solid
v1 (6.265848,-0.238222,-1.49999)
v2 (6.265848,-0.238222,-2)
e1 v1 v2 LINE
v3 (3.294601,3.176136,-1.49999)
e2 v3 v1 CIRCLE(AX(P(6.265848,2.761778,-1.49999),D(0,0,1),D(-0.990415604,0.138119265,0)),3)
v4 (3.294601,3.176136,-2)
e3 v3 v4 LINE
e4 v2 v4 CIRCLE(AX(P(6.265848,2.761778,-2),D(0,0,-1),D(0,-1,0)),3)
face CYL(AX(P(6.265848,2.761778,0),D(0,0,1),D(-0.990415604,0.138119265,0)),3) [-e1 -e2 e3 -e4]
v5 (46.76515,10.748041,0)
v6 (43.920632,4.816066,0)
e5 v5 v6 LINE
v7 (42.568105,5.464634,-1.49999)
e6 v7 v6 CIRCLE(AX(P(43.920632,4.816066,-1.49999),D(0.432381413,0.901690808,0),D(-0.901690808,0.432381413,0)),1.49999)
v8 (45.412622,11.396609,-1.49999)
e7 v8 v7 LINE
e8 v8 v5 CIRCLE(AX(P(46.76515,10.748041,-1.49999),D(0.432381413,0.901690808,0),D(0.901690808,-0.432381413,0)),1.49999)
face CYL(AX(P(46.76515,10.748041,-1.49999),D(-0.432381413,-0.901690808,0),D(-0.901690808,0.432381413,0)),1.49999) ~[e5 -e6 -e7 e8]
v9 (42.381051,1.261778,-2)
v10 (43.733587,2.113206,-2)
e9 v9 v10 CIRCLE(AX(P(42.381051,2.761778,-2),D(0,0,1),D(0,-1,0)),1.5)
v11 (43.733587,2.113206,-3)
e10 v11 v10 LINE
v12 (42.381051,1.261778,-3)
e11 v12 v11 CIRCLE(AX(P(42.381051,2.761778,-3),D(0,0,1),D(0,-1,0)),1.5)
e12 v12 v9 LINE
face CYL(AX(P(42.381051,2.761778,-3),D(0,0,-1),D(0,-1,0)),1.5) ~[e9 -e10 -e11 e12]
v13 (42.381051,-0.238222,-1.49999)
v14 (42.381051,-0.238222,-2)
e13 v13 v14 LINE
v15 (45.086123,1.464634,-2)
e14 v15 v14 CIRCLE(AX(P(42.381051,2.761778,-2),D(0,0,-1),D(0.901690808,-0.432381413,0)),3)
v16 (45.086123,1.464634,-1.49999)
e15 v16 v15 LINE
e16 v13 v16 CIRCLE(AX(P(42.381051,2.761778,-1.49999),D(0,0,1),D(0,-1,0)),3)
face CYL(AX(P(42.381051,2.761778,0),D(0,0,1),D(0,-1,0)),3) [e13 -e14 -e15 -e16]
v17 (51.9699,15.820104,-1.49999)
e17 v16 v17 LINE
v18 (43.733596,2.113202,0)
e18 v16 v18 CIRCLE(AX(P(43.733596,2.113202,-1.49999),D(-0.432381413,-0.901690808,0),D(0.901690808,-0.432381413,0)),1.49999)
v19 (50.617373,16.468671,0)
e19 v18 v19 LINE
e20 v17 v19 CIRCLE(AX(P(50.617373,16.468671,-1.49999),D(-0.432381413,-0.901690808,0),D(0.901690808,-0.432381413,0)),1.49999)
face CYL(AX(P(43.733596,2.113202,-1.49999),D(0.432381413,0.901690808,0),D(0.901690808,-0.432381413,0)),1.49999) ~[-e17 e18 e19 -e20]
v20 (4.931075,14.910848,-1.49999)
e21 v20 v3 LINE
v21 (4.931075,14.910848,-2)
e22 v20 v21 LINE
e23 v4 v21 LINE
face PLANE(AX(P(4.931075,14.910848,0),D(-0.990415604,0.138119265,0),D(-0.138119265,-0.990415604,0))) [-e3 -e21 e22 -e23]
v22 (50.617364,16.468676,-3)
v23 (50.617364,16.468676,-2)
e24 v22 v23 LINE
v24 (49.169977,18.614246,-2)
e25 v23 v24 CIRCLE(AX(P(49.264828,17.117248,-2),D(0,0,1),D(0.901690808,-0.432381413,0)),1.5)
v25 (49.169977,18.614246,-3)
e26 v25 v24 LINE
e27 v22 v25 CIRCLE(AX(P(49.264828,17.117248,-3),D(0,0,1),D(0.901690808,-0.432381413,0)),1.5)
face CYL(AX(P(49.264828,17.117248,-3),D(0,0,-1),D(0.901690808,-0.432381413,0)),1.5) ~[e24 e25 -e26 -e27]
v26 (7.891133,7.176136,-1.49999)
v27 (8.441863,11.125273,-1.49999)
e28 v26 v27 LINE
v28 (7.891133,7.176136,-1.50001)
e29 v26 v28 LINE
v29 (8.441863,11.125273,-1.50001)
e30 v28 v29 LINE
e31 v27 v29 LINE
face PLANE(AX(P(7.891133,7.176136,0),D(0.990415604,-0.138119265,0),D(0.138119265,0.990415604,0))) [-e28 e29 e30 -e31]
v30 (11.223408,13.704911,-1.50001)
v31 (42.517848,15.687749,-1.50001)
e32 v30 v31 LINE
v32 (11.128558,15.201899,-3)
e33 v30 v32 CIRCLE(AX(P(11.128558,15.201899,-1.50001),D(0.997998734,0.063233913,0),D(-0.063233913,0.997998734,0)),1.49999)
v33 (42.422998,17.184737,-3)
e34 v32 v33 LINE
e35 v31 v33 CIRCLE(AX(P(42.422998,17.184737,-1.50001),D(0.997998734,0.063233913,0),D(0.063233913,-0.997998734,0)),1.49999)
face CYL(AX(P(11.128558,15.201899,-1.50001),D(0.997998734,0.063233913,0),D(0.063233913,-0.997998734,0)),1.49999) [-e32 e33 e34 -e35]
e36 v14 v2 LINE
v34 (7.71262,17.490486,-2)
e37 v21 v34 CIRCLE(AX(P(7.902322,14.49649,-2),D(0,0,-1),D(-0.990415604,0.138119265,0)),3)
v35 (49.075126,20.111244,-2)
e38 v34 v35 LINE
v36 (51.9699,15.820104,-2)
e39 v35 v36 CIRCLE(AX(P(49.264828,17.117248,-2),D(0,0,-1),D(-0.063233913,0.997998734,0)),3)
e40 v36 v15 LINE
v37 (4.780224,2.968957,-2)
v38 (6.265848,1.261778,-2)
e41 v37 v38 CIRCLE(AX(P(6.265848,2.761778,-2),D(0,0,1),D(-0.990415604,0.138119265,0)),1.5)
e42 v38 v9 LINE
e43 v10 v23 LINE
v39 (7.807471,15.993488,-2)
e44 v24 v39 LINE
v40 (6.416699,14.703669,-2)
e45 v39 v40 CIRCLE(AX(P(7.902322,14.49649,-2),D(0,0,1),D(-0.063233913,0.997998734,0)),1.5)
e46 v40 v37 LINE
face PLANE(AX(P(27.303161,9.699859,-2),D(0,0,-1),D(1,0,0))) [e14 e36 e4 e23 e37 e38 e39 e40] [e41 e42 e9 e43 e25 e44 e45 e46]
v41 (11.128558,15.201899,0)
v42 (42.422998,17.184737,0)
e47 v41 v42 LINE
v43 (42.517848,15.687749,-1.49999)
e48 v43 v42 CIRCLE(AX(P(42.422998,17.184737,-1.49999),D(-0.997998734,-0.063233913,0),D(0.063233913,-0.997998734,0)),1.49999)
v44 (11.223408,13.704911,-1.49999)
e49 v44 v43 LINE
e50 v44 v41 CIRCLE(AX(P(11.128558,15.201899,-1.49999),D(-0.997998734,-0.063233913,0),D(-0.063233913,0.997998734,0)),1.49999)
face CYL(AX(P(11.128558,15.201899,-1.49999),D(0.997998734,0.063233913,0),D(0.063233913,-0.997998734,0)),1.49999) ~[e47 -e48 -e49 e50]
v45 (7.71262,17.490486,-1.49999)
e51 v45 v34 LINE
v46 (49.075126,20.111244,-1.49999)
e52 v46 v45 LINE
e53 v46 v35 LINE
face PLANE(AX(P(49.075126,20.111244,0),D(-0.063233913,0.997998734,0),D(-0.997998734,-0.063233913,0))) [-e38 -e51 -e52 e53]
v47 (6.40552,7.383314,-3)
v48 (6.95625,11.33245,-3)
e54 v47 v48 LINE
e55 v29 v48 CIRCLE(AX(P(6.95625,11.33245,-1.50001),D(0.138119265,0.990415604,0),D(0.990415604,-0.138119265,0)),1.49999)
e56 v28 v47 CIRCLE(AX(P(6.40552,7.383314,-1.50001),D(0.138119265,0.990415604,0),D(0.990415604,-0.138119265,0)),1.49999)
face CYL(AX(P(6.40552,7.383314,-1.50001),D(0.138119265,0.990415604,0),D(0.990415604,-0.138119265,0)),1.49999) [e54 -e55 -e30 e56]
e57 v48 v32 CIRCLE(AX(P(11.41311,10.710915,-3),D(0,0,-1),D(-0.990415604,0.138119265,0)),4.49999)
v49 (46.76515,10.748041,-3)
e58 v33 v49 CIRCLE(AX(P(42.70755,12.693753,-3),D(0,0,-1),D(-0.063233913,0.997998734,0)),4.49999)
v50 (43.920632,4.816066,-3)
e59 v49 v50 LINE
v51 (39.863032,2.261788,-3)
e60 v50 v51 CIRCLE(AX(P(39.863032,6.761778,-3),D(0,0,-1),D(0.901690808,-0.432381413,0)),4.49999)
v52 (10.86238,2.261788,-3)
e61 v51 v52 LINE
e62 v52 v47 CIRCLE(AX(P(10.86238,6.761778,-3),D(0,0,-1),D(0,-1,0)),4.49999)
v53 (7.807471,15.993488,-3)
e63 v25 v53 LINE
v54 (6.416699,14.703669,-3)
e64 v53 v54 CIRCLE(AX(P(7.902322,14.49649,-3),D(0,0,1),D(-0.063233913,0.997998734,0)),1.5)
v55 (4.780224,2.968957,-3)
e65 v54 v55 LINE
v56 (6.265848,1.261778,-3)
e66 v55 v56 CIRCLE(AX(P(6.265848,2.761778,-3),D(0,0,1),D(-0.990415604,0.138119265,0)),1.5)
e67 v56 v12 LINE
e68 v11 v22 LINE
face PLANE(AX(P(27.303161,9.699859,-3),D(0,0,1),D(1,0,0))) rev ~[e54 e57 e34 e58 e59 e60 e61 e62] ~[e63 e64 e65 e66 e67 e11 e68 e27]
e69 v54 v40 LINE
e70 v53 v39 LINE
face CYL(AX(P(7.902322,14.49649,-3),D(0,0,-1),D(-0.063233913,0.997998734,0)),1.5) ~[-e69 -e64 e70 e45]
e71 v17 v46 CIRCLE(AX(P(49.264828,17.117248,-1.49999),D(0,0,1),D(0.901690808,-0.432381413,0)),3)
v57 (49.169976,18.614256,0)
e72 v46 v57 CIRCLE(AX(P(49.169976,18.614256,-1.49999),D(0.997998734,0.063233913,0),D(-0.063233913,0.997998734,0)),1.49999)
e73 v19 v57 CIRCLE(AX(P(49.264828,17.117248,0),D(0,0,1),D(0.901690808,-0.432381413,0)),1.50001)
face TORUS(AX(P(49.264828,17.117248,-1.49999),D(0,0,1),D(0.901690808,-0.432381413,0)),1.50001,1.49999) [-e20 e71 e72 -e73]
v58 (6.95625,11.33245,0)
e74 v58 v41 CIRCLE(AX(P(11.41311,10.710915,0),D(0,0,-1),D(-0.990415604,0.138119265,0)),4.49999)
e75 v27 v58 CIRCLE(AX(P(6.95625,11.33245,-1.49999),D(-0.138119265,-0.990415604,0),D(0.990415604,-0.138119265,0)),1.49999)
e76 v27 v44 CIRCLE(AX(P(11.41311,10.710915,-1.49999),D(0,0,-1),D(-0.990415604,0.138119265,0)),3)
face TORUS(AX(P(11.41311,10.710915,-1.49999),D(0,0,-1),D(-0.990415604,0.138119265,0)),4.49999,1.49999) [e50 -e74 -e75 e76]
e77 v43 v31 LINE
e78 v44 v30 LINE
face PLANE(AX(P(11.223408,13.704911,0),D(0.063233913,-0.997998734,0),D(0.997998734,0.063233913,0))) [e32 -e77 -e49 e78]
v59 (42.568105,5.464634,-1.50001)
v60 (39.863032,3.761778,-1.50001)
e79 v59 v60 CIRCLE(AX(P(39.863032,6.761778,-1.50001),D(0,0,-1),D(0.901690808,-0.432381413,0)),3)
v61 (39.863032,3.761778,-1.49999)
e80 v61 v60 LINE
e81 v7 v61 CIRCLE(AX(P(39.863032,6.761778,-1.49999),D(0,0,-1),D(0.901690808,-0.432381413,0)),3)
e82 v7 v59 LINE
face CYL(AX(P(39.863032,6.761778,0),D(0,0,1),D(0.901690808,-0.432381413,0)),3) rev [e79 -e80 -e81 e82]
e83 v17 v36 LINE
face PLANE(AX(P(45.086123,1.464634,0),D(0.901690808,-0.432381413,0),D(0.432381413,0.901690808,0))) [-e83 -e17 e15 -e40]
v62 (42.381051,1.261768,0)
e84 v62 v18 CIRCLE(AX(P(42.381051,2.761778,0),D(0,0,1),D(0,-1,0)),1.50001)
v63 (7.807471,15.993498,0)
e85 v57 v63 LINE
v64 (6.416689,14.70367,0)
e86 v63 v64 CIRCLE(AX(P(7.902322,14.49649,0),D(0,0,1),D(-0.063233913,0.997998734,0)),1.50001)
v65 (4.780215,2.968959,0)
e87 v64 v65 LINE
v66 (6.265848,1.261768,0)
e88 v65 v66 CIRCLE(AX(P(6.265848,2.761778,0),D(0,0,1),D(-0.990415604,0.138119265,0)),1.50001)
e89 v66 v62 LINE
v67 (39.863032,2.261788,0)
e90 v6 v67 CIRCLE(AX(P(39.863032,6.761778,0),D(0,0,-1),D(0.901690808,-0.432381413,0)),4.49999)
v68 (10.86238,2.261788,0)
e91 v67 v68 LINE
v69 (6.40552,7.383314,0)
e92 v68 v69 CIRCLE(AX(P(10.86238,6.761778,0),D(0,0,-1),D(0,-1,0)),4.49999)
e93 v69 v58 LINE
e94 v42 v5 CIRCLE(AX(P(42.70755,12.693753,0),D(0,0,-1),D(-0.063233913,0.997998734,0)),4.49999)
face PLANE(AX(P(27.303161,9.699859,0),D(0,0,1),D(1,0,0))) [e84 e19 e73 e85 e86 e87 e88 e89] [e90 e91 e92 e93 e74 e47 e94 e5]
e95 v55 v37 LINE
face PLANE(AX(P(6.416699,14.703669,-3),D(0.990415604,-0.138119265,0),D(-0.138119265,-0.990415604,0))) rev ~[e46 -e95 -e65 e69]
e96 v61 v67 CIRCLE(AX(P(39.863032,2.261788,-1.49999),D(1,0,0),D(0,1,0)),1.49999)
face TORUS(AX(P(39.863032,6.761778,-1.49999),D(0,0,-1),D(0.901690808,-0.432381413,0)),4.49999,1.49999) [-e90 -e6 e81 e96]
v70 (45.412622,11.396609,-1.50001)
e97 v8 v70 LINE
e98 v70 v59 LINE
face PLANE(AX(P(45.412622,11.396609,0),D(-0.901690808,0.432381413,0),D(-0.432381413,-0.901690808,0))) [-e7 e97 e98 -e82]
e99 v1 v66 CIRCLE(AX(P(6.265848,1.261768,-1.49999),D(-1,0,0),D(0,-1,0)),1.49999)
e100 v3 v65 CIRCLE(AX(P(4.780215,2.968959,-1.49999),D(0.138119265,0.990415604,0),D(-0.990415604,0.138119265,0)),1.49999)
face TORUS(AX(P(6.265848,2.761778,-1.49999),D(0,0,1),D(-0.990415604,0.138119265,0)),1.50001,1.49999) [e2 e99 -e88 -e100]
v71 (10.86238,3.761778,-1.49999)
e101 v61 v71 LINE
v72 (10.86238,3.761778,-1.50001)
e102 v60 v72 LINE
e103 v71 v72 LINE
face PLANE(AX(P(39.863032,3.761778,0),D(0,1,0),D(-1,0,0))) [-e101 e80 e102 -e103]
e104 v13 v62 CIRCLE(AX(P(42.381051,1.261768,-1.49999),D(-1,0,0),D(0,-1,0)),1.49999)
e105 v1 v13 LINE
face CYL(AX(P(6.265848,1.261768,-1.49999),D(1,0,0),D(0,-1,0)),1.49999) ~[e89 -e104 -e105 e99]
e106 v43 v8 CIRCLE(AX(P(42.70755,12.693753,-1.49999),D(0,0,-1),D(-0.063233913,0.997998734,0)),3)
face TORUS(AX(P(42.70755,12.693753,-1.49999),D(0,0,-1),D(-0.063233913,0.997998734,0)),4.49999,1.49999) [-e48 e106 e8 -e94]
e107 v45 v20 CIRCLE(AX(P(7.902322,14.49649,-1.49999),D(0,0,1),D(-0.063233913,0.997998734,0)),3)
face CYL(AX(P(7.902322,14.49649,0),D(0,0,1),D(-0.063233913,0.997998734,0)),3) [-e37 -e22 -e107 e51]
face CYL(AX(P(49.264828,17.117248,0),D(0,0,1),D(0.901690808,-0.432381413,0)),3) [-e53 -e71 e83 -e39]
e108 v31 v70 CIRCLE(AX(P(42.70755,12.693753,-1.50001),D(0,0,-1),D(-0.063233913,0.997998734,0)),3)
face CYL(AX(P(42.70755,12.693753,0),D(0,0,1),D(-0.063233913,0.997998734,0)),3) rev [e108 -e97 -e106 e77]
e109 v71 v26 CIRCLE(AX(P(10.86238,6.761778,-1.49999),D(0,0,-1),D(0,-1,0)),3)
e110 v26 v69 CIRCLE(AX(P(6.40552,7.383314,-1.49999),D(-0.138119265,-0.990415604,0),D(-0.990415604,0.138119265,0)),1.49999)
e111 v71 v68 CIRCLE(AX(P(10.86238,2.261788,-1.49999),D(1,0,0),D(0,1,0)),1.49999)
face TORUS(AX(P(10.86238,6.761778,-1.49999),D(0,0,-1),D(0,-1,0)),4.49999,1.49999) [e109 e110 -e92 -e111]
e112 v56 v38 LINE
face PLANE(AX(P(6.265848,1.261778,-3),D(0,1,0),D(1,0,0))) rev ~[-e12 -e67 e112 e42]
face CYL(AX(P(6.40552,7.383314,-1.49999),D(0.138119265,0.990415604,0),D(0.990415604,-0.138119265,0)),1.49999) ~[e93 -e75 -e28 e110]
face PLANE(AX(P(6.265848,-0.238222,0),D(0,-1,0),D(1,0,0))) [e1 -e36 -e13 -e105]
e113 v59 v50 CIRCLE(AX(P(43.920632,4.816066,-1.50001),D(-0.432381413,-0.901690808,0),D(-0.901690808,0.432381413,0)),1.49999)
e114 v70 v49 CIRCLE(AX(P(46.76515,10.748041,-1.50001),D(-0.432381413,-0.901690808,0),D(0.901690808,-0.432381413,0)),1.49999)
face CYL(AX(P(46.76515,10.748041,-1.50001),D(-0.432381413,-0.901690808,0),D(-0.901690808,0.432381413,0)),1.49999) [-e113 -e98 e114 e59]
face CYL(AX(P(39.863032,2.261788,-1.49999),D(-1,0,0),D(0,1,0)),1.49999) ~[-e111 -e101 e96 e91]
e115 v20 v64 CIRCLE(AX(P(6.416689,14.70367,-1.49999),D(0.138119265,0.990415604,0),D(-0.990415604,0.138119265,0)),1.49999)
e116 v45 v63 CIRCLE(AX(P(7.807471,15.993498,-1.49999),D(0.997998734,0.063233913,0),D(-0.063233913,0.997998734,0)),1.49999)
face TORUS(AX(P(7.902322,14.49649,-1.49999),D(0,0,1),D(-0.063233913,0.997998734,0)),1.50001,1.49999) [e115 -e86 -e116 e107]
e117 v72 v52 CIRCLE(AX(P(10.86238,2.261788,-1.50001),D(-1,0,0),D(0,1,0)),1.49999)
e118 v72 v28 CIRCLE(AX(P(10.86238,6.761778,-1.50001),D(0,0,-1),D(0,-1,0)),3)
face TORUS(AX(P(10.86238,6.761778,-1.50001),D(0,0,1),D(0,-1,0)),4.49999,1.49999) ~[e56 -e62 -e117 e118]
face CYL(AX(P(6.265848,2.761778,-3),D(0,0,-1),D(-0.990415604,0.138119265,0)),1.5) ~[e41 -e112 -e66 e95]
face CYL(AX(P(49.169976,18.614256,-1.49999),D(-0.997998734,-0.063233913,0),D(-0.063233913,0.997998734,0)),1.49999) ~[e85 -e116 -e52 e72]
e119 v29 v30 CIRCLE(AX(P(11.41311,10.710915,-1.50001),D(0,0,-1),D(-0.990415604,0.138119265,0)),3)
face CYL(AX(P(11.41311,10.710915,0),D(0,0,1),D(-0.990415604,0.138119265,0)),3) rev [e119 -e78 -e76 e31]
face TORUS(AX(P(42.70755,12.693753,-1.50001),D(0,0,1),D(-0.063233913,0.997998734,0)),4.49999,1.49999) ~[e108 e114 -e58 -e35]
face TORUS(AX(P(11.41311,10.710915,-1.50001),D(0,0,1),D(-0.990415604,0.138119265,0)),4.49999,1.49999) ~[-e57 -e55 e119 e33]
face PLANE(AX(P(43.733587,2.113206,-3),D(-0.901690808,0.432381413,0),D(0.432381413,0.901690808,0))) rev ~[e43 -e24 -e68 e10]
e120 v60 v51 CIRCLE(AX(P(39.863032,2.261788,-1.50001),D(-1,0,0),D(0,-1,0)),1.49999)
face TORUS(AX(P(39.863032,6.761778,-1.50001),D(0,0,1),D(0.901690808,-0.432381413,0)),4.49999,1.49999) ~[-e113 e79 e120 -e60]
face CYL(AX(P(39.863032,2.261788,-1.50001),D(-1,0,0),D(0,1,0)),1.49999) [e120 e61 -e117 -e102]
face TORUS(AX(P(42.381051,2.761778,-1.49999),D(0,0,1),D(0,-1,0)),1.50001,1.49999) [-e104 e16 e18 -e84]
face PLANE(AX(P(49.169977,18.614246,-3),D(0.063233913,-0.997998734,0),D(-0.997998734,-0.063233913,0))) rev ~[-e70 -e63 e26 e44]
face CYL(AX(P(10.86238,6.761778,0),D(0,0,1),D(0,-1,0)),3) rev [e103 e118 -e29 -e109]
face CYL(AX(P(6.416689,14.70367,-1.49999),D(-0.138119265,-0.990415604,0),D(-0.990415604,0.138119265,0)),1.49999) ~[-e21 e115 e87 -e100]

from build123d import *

# Parameters (mm, degrees)
F1_DEPTH = 3
F2_R     = 1.49999
F5_DEPTH = 1


# Not quite as in the source:
# - a fillet or chamfer is up to 0.001 mm smaller than in the source, because OpenCascade refuses the exact size
# - a feature names something its author has since deleted; it is built from what else it names


with BuildPart() as f1:
    # F0 (on Top) → F1 (new body)
    with BuildSketch(Plane.XY):
        with BuildLine():
            ThreePointArc((7.7126204308, 17.4904861667), (5.8623387123, 16.6961416403), (4.9310753592, 14.9108477622))
            Line((4.9310753592, 14.9108477622), (3.2946010031, 3.1761362209))
            ThreePointArc((3.2946010031, 3.1761362209), (4.002766576, 0.7923969722), (6.265847815, -0.2382215753))
            Line((6.265847815, -0.2382215753), (42.381050937, -0.2382215753))
            ThreePointArc((42.381050937, -0.2382215753), (43.9792635765, 0.2229368859), (45.0861233616, 1.4646341854))
            Line((45.0861233616, 1.4646341854), (51.9699000588, 15.820103651))
            ThreePointArc((51.9699000588, 15.820103651), (51.7518427103, 18.7949713512), (49.0751258939, 20.1112440911))
            Line((49.0751258939, 20.1112440911), (7.7126204308, 17.4904861667))
        make_face()
        with BuildLine():
            Line((39.8630322028, 3.7617784247), (10.8623798602, 3.7617784247))
            ThreePointArc((10.8623798602, 3.7617784247), (8.5992986212, 4.7923969722), (7.8911330484, 7.1761362209))
            Line((7.8911330484, 7.1761362209), (8.4418632915, 11.125272678))
            ThreePointArc((8.4418632915, 11.125272678), (9.3731266446, 12.9105665561), (11.2234083631, 13.7049110825))
            Line((11.2234083631, 13.7049110825), (42.5178482436, 15.6877491719))
            ThreePointArc((42.5178482436, 15.6877491719), (45.19456506, 14.3714764321), (45.4126224085, 11.3966087319))
            Line((45.4126224085, 11.3966087319), (42.5681046274, 5.4646341854))
            ThreePointArc((42.5681046274, 5.4646341854), (41.4612448422, 4.2229368859), (39.8630322028, 3.7617784247))
        make_face(mode=Mode.SUBTRACT)
    extrude(amount=-F1_DEPTH)

    # F2 (radius 1.5 in the source; OpenCascade refuses exactly that, so slightly less here)
    f2_edges = [f1.edges().sort_by_distance(p)[0] for p in [
        (24.323449, -0.238222, 0),
        (48.528012, 8.642369, 0),
        (28.393873, 18.800865, 0),
        (4.112838, 9.043492, 0),
        (25.362706, 3.761778, 0),
        (8.166498, 9.150704, 0),
        (43.990364, 8.430621, 0),
        (26.870628, 14.69633, 0),
        (8.166498, 9.150704, -3),
        (25.362706, 3.761778, -3),
        (26.870628, 14.69633, -3),
        (43.990364, 8.430621, -3),
    ]]
    fillet(f2_edges, radius=F2_R)

    # F4 (on offset) → F5 (cut)
    with BuildSketch(Plane(origin=(0, 0, -3), x_dir=(1, 0, 0), z_dir=(0, 0, -1))):
        with BuildLine():
            Line((3.2946010031, -3.1761362209), (4.9310753592, -14.9108477622))
            ThreePointArc((4.9310753592, -14.9108477622), (5.8623387123, -16.6961416403), (7.7126204308, -17.4904861667))
            Line((7.7126204308, -17.4904861667), (49.0751258939, -20.1112440911))
            ThreePointArc((49.0751258939, -20.1112440911), (51.7518427103, -18.7949713512), (51.9699000588, -15.820103651))
            Line((51.9699000588, -15.820103651), (45.0861233616, -1.4646341854))
            ThreePointArc((45.0861233616, -1.4646341854), (43.9792635765, -0.2229368859), (42.381050937, 0.2382215753))
            Line((42.381050937, 0.2382215753), (6.265847815, 0.2382215753))
            ThreePointArc((6.265847815, 0.2382215753), (4.002766576, -0.7923969722), (3.2946010031, -3.1761362209))
        make_face()
        with BuildLine():
            ThreePointArc((50.6173638465, -16.4686757707), (50.5083351723, -17.9561096208), (49.1699767641, -18.6142459907))
            Line((49.1699767641, -18.6142459907), (7.8074713009, -15.9934880663))
            ThreePointArc((7.8074713009, -15.9934880663), (6.8823304417, -15.5963158031), (6.4166987651, -14.7036688641))
            Line((6.4166987651, -14.7036688641), (4.7802244091, -2.9689573228))
            ThreePointArc((4.7802244091, -2.9689573228), (5.1343071955, -1.7770876984), (6.265847815, -1.2617784247))
            Line((6.265847815, -1.2617784247), (42.381050937, -1.2617784247))
            ThreePointArc((42.381050937, -1.2617784247), (43.1801572567, -1.4923576553), (43.7335871493, -2.113206305))
            Line((43.7335871493, -2.113206305), (50.6173638465, -16.4686757707))
        make_face(mode=Mode.SUBTRACT)
    extrude(amount=-F5_DEPTH, mode=Mode.SUBTRACT)


solid = f1.part
